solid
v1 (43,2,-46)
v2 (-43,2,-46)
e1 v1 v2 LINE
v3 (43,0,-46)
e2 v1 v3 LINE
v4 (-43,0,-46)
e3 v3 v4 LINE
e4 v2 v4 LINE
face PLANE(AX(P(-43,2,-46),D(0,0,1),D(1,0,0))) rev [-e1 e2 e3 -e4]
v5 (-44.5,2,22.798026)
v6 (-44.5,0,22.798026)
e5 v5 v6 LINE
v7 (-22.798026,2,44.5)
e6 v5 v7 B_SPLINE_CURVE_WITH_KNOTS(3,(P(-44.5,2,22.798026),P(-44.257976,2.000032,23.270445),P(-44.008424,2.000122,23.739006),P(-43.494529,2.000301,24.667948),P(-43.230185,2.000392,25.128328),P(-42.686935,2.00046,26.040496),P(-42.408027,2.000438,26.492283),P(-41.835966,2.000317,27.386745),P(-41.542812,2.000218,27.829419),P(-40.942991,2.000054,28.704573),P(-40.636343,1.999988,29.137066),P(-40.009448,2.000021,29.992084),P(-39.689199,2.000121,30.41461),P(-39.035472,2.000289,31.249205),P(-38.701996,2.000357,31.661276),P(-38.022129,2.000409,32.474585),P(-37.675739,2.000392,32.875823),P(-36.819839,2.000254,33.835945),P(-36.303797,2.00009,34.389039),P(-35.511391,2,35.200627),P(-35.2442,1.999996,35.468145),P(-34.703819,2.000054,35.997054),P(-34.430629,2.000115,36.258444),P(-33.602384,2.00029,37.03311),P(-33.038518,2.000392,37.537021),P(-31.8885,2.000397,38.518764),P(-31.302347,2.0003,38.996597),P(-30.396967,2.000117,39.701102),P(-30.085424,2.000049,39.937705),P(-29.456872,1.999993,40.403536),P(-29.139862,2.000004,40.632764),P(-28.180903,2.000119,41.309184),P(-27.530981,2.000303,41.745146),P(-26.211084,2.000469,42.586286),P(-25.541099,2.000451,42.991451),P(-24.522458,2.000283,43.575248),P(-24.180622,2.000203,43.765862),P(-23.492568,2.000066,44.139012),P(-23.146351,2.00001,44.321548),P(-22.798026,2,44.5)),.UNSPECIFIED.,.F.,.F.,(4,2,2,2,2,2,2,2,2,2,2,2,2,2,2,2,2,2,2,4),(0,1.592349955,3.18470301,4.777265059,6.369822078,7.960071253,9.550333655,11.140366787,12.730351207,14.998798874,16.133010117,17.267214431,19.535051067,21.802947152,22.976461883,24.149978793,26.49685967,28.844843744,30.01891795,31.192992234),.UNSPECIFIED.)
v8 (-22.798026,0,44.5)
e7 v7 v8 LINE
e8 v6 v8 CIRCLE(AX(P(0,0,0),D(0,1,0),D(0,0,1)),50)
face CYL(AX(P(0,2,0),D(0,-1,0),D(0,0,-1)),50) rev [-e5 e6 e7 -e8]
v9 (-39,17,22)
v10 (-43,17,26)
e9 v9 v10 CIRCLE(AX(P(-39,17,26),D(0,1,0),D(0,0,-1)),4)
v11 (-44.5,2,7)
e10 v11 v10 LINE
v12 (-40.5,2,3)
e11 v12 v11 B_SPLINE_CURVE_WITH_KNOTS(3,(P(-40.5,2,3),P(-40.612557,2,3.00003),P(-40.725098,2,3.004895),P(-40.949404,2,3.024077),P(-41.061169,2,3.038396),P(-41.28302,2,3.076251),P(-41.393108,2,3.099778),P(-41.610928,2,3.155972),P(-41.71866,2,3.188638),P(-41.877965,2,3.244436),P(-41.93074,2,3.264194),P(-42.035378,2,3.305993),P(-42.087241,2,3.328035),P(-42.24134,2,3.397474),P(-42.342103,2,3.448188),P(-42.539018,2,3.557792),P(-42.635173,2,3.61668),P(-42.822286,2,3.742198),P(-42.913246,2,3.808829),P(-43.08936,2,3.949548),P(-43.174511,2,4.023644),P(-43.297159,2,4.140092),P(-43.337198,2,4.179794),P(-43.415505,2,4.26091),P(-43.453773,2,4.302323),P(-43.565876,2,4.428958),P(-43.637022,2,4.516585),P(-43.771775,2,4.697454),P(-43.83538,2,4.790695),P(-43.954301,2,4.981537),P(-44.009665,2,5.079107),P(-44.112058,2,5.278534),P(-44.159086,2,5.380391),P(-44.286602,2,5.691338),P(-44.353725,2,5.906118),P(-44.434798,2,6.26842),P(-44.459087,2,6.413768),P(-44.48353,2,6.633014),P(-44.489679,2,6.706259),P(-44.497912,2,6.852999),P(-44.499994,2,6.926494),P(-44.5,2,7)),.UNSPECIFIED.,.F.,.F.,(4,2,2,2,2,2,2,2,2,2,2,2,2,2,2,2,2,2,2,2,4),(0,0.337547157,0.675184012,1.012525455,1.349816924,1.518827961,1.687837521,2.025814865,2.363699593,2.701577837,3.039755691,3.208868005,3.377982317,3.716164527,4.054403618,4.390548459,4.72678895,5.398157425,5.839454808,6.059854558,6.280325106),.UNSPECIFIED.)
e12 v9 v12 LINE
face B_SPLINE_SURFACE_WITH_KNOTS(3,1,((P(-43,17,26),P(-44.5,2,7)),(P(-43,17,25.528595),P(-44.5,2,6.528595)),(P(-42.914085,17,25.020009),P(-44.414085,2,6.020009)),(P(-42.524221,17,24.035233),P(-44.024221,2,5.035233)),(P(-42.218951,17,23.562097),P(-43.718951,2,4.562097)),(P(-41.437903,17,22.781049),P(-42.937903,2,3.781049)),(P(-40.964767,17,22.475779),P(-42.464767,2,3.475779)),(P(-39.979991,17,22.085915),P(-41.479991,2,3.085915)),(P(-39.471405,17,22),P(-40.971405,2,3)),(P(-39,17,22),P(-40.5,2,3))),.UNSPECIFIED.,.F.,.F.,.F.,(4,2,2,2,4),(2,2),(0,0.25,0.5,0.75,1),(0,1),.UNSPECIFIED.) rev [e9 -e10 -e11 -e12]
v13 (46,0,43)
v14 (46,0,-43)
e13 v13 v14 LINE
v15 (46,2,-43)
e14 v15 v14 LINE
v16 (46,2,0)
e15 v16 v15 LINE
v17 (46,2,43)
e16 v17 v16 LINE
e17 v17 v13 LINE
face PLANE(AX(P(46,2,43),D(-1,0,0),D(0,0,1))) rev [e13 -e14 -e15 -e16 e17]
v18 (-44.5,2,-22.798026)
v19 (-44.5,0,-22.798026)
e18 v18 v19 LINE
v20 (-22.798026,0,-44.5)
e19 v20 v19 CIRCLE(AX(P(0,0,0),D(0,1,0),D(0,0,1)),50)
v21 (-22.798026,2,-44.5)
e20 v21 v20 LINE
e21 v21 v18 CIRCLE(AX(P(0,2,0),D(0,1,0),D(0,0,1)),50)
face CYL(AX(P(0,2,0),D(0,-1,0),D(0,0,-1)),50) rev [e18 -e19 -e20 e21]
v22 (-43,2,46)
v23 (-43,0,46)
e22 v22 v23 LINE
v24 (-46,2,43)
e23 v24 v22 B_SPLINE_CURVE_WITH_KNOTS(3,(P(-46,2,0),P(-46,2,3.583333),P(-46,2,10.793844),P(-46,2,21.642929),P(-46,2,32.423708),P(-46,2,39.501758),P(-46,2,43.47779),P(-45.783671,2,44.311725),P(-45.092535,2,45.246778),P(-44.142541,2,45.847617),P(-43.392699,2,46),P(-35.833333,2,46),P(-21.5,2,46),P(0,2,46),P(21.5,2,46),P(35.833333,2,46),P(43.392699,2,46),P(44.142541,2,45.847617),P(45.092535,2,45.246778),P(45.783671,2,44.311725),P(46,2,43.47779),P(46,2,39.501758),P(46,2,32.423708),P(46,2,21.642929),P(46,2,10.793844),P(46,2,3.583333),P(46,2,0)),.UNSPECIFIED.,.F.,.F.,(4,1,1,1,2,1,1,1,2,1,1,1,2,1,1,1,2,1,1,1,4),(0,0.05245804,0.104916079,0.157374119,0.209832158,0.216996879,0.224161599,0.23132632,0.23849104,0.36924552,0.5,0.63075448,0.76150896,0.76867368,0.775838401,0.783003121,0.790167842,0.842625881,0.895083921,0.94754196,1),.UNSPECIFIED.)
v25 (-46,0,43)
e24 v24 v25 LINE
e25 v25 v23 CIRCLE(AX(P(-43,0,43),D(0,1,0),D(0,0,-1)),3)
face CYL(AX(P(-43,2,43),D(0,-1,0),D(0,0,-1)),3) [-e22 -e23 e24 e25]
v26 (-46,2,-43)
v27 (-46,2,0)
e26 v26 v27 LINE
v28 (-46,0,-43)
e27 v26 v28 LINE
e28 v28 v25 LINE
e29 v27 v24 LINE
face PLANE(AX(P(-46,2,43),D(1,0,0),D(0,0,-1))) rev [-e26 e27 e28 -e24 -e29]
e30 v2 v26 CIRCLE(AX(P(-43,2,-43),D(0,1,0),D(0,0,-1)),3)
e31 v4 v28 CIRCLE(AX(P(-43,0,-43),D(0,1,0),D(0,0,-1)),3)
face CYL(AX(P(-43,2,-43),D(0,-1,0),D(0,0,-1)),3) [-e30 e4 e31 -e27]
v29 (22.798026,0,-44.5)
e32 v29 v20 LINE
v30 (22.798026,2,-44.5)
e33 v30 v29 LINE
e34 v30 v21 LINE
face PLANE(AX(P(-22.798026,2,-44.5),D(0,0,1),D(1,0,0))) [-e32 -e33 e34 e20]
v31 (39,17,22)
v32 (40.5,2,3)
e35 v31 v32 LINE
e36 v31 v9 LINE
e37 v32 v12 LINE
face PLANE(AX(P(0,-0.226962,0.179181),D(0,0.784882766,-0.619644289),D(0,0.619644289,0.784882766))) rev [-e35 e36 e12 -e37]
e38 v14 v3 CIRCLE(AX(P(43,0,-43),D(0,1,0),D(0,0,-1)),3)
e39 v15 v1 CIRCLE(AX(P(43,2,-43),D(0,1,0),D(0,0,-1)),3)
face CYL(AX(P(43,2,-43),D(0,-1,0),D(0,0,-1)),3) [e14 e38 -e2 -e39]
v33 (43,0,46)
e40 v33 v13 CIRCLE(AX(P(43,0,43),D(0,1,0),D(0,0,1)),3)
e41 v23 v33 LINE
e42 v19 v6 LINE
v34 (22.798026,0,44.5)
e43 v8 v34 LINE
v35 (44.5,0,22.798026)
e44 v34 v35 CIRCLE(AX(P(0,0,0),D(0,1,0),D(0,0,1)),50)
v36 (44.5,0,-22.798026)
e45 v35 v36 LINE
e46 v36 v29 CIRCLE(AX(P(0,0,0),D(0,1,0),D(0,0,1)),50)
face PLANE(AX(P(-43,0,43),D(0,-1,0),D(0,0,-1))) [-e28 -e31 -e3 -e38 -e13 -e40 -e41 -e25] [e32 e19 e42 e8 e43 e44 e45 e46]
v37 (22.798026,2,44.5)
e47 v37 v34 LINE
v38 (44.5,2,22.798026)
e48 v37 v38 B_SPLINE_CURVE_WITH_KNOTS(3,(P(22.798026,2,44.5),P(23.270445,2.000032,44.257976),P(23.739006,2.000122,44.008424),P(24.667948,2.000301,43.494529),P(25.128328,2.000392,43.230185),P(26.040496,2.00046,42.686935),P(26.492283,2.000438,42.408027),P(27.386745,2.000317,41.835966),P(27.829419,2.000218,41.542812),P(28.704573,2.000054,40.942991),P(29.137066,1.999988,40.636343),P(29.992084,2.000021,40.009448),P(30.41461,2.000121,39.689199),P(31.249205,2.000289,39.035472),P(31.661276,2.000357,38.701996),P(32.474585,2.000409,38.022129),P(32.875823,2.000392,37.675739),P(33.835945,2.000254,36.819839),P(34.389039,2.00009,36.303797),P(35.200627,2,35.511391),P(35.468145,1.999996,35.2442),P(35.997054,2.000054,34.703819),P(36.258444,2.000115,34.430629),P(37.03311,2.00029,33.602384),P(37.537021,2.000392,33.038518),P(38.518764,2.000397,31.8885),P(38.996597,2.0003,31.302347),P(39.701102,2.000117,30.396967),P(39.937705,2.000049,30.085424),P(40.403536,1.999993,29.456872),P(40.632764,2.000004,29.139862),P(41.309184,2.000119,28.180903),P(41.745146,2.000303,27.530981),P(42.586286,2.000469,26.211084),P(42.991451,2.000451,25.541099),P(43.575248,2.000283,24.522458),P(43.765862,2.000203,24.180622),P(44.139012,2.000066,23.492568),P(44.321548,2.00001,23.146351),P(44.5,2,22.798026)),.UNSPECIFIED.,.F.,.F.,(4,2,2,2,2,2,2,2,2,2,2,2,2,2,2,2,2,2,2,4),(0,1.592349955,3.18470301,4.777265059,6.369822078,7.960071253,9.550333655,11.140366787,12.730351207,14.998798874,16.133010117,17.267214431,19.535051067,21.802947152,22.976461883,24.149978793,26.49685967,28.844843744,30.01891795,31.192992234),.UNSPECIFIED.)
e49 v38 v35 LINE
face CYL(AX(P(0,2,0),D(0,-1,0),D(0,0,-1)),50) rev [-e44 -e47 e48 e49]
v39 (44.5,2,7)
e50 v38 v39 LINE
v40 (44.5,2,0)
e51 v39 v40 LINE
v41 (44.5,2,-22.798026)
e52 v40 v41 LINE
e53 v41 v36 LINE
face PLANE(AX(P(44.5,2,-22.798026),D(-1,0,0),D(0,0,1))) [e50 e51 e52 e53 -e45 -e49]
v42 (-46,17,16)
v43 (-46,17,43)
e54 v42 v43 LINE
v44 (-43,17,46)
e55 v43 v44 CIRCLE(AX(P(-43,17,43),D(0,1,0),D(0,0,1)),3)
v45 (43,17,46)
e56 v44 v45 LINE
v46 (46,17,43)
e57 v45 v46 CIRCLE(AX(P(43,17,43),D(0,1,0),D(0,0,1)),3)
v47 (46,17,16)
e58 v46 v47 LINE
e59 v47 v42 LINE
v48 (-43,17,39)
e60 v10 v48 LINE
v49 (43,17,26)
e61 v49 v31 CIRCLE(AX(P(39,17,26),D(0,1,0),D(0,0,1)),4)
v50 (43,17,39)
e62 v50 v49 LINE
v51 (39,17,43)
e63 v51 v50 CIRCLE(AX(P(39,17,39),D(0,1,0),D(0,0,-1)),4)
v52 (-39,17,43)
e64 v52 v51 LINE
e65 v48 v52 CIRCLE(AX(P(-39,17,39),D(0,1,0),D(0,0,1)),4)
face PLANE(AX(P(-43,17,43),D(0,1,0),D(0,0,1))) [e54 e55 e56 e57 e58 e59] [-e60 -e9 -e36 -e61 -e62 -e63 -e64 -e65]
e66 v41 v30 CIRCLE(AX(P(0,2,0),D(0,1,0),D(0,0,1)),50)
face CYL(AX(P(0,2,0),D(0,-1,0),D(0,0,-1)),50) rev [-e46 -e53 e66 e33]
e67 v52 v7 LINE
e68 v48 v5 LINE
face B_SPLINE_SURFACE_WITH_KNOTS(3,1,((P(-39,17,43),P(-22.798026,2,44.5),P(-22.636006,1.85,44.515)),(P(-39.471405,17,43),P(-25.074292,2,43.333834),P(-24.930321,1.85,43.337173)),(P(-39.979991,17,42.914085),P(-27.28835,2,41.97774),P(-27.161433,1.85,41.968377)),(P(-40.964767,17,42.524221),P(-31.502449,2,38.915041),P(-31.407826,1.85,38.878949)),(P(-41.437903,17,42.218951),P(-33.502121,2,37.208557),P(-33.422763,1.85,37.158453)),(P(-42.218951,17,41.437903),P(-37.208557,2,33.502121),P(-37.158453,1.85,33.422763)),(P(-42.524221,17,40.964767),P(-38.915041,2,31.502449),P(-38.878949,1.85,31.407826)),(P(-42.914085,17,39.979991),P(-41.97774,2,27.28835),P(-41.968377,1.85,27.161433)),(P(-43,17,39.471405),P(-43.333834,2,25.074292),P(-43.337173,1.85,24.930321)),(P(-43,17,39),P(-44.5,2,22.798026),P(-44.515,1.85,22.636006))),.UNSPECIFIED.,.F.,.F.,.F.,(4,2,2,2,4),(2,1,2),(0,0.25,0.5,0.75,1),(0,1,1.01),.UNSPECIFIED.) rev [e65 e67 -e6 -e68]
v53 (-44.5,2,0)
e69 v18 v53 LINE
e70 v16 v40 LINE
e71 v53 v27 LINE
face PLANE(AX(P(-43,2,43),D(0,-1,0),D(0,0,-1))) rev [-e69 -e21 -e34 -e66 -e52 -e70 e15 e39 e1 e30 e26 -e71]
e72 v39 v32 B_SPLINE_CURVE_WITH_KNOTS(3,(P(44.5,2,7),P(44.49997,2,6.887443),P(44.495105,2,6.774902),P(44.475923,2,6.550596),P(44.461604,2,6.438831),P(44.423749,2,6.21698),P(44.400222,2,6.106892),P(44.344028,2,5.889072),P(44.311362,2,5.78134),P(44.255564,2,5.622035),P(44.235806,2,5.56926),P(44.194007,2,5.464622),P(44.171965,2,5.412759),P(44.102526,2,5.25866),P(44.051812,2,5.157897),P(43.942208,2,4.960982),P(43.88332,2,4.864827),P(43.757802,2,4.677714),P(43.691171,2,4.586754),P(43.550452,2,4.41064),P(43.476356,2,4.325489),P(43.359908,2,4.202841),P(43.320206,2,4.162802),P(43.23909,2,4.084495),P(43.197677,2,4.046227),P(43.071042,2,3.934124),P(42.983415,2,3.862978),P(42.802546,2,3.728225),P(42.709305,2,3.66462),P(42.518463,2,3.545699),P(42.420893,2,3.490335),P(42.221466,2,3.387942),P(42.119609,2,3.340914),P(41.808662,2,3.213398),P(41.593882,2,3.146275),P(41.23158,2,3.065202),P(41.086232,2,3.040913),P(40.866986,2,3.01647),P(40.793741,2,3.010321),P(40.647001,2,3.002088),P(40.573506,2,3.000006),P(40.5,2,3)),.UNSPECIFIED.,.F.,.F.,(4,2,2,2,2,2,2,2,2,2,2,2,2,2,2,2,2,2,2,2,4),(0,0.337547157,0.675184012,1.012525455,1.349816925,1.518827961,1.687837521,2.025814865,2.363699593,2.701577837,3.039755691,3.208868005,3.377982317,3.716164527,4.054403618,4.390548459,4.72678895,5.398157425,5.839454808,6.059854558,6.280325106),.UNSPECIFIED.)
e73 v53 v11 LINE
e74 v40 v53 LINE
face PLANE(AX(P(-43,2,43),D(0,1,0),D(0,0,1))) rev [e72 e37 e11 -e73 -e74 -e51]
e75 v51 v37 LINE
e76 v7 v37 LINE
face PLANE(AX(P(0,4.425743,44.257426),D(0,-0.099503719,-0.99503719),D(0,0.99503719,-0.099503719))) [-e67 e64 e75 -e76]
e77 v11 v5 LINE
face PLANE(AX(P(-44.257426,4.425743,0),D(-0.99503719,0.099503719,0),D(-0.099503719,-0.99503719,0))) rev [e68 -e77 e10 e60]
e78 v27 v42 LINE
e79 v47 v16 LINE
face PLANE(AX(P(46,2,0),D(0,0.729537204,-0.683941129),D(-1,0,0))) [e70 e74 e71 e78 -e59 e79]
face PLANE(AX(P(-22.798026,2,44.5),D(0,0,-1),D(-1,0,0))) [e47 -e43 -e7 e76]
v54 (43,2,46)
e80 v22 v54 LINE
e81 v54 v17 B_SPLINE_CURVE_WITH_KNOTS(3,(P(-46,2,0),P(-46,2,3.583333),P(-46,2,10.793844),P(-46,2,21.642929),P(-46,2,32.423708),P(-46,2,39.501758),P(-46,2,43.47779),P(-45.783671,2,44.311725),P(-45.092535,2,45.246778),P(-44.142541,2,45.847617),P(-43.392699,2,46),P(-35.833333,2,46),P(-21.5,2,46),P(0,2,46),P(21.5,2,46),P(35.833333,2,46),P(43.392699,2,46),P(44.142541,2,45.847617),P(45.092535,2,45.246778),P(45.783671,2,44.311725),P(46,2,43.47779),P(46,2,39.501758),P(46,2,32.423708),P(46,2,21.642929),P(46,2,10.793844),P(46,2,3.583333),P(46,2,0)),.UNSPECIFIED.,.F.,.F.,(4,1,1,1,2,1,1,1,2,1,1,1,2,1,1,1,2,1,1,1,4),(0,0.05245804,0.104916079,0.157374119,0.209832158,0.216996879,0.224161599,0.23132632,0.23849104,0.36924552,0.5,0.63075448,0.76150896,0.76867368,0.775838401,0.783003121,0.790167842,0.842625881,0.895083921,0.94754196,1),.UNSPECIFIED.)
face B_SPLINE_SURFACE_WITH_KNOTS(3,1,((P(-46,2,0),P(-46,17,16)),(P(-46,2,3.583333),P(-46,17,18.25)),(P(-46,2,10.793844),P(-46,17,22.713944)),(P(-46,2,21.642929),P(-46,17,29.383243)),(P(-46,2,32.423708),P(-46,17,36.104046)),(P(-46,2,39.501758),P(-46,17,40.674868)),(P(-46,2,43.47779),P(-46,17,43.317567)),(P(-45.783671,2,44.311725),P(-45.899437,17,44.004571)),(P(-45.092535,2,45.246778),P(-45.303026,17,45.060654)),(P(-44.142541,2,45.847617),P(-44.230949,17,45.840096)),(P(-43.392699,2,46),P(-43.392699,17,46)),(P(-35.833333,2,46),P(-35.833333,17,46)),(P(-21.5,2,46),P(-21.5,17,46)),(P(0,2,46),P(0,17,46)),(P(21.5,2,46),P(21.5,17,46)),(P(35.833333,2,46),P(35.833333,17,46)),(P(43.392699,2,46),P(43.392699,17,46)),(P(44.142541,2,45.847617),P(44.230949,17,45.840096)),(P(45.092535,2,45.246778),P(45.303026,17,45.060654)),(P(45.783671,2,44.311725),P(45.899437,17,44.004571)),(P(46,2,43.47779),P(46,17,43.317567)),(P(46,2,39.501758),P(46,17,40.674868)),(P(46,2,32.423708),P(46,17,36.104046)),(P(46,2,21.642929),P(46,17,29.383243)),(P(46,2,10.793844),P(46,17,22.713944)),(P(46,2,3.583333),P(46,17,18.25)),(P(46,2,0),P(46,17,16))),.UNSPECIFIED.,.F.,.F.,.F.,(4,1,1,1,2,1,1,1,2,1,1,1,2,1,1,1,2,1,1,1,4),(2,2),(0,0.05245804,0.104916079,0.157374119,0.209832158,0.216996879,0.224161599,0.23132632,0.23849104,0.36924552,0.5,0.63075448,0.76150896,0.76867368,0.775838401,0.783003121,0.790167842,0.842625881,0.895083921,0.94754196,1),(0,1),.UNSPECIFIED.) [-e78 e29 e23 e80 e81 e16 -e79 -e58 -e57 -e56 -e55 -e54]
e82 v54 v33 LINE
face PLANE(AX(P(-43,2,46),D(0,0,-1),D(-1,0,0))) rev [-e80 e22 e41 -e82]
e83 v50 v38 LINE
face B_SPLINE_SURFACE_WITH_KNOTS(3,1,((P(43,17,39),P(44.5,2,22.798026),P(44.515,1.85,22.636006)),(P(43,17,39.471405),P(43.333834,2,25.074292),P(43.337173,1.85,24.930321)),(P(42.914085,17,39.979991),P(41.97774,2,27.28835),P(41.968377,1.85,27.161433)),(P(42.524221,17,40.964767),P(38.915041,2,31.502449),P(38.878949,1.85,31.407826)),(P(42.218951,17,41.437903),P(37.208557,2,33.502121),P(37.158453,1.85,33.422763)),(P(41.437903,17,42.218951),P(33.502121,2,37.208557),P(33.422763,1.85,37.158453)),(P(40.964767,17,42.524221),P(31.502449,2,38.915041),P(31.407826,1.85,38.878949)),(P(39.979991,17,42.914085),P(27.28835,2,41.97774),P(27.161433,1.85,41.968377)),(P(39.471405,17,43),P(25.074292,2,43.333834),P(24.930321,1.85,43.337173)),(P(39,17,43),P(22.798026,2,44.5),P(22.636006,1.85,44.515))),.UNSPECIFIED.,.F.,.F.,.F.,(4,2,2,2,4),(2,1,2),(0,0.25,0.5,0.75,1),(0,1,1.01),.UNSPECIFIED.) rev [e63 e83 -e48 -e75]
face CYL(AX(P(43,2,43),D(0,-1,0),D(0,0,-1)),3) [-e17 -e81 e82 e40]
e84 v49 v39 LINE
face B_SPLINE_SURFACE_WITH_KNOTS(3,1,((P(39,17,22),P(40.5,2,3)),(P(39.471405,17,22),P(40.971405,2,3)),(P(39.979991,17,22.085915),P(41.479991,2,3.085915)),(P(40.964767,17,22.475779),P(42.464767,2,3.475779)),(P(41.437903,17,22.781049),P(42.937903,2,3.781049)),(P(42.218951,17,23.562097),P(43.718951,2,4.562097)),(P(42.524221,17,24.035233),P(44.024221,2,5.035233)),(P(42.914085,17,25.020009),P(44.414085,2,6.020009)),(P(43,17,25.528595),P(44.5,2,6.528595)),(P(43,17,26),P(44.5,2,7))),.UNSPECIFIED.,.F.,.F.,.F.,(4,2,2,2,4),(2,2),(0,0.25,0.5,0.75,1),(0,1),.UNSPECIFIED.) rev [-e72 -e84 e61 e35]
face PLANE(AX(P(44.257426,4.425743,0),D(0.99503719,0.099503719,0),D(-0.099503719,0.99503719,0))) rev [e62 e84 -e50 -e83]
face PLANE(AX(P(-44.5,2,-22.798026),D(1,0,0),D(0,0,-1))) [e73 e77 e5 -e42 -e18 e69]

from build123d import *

# Parameters (mm, degrees)
SALIENTE_EXTRUIR1_DEPTH = 2


with BuildPart() as part:
    # Croquis1 → Saliente-Extruir1 (new body)
    with BuildSketch(Plane(origin=(0, 0, 0), x_dir=(1, 0, 0), z_dir=(0, 1, 0))):
        with BuildLine():
            Line((-43, -46), (43, -46))
            ThreePointArc((43, -46), (45.121320344, -45.121320344), (46, -43))
            Line((46, -43), (46, 43))
            ThreePointArc((46, 43), (45.121320344, 45.121320344), (43, 46))
            Line((43, 46), (-43, 46))
            ThreePointArc((-43, 46), (-45.121320344, 45.121320344), (-46, 43))
            Line((-46, 43), (-46, -43))
            ThreePointArc((-46, -43), (-45.121320344, -45.121320344), (-43, -46))
        make_face()
        with BuildLine():
            Line((-22.79802623, 44.5), (22.79802623, 44.5))
            ThreePointArc((22.79802623, 44.5), (35.355339059, 35.355339059), (44.5, 22.79802623))
            Line((44.5, 22.79802623), (44.5, -22.79802623))
            ThreePointArc((44.5, -22.79802623), (35.355339059, -35.355339059), (22.79802623, -44.5))
            Line((22.79802623, -44.5), (-22.79802623, -44.5))
            ThreePointArc((-22.79802623, -44.5), (-35.355339059, -35.355339059), (-44.5, -22.79802623))
            Line((-44.5, -22.79802623), (-44.5, 22.79802623))
            ThreePointArc((-44.5, 22.79802623), (-35.355339059, 35.355339059), (-22.79802623, 44.5))
        make_face(mode=Mode.SUBTRACT)
    extrude(amount=SALIENTE_EXTRUIR1_DEPTH)

    # Recubrir2: read off the stored shape, not the designer's step
    # Recubrir2: loft between two sections, ruled curve by curve
    recubrir2_from = [
        Edge.make_bspline([(-46, 2, 0), (-46, 2, 3.583333333), (-46, 2, 10.793843818), (-46, 2, 21.642929413), (-46, 2, 32.423708324), (-46, 2, 39.501757631), (-46, 2, 43.477790042), (-45.783671462, 2, 44.311725412), (-45.092534915, 2, 45.246778084), (-44.142540647, 2, 45.847617023), (-43.392699079, 2, 46), (-35.833333333, 2, 46), (-21.5, 2, 46), (0, 2, 46), (21.5, 2, 46), (35.833333333, 2, 46), (43.392699079, 2, 46), (44.142540647, 2, 45.847617023), (45.092534915, 2, 45.246778084), (45.783671462, 2, 44.311725412), (46, 2, 43.477790042), (46, 2, 39.501757631), (46, 2, 32.423708324), (46, 2, 21.642929413), (46, 2, 10.793843818), (46, 2, 3.583333333), (46, 2, 0)], [0, 0, 0, 0, 0.05245804, 0.104916079, 0.157374119, 0.209832158, 0.209832158, 0.216996879, 0.224161599, 0.23132632, 0.23849104, 0.23849104, 0.36924552, 0.5, 0.63075448, 0.76150896, 0.76150896, 0.76867368, 0.775838401, 0.783003121, 0.790167842, 0.790167842, 0.842625881, 0.895083921, 0.94754196, 1, 1, 1, 1], 3),
        Edge.make_line((46, 2, 0), (-46, 2, 0)),
    ]
    recubrir2_to = [
        Edge.make_bspline([(-46, 17, 16), (-46, 17, 18.25), (-46, 17, 22.713944004), (-46, 17, 29.383243466), (-46, 17, 36.10404607), (-46, 17, 40.674867573), (-46, 17, 43.317566653), (-45.899436706, 17, 44.004571477), (-45.303026141, 17, 45.060653885), (-44.230949162, 17, 45.840096066), (-43.392699079, 17, 46), (-35.833333333, 17, 46), (-21.5, 17, 46), (0, 17, 46), (21.5, 17, 46), (35.833333333, 17, 46), (43.392699079, 17, 46), (44.230949162, 17, 45.840096066), (45.303026141, 17, 45.060653885), (45.899436706, 17, 44.004571477), (46, 17, 43.317566653), (46, 17, 40.674867573), (46, 17, 36.10404607), (46, 17, 29.383243466), (46, 17, 22.713944004), (46, 17, 18.25), (46, 17, 16)], [0, 0, 0, 0, 0.05245804, 0.104916079, 0.157374119, 0.209832158, 0.209832158, 0.216996879, 0.224161599, 0.23132632, 0.23849104, 0.23849104, 0.36924552, 0.5, 0.63075448, 0.76150896, 0.76150896, 0.76867368, 0.775838401, 0.783003121, 0.790167842, 0.790167842, 0.842625881, 0.895083921, 0.94754196, 1, 1, 1, 1], 3),
        Edge.make_line((46, 17, 16), (-46, 17, 16)),
    ]
    recubrir2 = Solid(Shell([*[Face.make_surface_from_curves(recubrir2_from[k], recubrir2_to[k]) for k in range(2)], Face(Wire(recubrir2_from)), Face(Wire(recubrir2_to))]))
    add(recubrir2)

    # Croquis3 for Cortar-Recub → Cortar-Recubrir1 section 0
    with BuildSketch(Plane(origin=(0, 17, 0), x_dir=(1, 0, 0), z_dir=(0, 1, 0))):
        with BuildLine():
            Line((-43, -39), (-43, -26))
            # circular arc as an exact rational Bezier (weights 1, cos(half-angle), 1)
            Bezier((-43, -26), (-43, -22), (-39, -22), weights=[1, 0.707106781, 1])
            Line((-39, -22), (39, -22))
            Bezier((39, -22), (43, -22), (43, -26), weights=[1, 0.707106781, 1])
            Line((43, -26), (43, -39))
            Bezier((43, -39), (43, -43), (39, -43), weights=[1, 0.707106781, 1])
            Line((39, -43), (-39, -43))
            Bezier((-39, -43), (-43, -43), (-43, -39), weights=[1, 0.707106781, 1])
        make_face()
    # Croquis5 for Cortar-Recub → Cortar-Recubrir1 section 1
    with BuildSketch(Plane(origin=(0, 2, 0), x_dir=(1, 0, 0), z_dir=(0, 1, 0))):
        with BuildLine():
            Line((44.5, -22.79802623), (44.5, -7))
            Bezier((44.5, -7), (44.5, -3), (40.5, -3), weights=[1, 0.707106781, 1])
            Line((40.5, -3), (-40.5, -3))
            Bezier((-40.5, -3), (-44.5, -3), (-44.5, -7), weights=[1, 0.707106781, 1])
            Line((-44.5, -7), (-44.5, -22.79802623))
            Bezier((-44.5, -22.79802623), (-37.148192006, -37.148192006), (-22.79802623, -44.5), weights=[1, 0.951737814, 1])
            Line((-22.79802623, -44.5), (22.79802623, -44.5))
            Bezier((22.79802623, -44.5), (37.148192006, -37.148192006), (44.5, -22.79802623), weights=[1, 0.951737814, 1])
        make_face()
    loft(mode=Mode.SUBTRACT)


solid = part.part
